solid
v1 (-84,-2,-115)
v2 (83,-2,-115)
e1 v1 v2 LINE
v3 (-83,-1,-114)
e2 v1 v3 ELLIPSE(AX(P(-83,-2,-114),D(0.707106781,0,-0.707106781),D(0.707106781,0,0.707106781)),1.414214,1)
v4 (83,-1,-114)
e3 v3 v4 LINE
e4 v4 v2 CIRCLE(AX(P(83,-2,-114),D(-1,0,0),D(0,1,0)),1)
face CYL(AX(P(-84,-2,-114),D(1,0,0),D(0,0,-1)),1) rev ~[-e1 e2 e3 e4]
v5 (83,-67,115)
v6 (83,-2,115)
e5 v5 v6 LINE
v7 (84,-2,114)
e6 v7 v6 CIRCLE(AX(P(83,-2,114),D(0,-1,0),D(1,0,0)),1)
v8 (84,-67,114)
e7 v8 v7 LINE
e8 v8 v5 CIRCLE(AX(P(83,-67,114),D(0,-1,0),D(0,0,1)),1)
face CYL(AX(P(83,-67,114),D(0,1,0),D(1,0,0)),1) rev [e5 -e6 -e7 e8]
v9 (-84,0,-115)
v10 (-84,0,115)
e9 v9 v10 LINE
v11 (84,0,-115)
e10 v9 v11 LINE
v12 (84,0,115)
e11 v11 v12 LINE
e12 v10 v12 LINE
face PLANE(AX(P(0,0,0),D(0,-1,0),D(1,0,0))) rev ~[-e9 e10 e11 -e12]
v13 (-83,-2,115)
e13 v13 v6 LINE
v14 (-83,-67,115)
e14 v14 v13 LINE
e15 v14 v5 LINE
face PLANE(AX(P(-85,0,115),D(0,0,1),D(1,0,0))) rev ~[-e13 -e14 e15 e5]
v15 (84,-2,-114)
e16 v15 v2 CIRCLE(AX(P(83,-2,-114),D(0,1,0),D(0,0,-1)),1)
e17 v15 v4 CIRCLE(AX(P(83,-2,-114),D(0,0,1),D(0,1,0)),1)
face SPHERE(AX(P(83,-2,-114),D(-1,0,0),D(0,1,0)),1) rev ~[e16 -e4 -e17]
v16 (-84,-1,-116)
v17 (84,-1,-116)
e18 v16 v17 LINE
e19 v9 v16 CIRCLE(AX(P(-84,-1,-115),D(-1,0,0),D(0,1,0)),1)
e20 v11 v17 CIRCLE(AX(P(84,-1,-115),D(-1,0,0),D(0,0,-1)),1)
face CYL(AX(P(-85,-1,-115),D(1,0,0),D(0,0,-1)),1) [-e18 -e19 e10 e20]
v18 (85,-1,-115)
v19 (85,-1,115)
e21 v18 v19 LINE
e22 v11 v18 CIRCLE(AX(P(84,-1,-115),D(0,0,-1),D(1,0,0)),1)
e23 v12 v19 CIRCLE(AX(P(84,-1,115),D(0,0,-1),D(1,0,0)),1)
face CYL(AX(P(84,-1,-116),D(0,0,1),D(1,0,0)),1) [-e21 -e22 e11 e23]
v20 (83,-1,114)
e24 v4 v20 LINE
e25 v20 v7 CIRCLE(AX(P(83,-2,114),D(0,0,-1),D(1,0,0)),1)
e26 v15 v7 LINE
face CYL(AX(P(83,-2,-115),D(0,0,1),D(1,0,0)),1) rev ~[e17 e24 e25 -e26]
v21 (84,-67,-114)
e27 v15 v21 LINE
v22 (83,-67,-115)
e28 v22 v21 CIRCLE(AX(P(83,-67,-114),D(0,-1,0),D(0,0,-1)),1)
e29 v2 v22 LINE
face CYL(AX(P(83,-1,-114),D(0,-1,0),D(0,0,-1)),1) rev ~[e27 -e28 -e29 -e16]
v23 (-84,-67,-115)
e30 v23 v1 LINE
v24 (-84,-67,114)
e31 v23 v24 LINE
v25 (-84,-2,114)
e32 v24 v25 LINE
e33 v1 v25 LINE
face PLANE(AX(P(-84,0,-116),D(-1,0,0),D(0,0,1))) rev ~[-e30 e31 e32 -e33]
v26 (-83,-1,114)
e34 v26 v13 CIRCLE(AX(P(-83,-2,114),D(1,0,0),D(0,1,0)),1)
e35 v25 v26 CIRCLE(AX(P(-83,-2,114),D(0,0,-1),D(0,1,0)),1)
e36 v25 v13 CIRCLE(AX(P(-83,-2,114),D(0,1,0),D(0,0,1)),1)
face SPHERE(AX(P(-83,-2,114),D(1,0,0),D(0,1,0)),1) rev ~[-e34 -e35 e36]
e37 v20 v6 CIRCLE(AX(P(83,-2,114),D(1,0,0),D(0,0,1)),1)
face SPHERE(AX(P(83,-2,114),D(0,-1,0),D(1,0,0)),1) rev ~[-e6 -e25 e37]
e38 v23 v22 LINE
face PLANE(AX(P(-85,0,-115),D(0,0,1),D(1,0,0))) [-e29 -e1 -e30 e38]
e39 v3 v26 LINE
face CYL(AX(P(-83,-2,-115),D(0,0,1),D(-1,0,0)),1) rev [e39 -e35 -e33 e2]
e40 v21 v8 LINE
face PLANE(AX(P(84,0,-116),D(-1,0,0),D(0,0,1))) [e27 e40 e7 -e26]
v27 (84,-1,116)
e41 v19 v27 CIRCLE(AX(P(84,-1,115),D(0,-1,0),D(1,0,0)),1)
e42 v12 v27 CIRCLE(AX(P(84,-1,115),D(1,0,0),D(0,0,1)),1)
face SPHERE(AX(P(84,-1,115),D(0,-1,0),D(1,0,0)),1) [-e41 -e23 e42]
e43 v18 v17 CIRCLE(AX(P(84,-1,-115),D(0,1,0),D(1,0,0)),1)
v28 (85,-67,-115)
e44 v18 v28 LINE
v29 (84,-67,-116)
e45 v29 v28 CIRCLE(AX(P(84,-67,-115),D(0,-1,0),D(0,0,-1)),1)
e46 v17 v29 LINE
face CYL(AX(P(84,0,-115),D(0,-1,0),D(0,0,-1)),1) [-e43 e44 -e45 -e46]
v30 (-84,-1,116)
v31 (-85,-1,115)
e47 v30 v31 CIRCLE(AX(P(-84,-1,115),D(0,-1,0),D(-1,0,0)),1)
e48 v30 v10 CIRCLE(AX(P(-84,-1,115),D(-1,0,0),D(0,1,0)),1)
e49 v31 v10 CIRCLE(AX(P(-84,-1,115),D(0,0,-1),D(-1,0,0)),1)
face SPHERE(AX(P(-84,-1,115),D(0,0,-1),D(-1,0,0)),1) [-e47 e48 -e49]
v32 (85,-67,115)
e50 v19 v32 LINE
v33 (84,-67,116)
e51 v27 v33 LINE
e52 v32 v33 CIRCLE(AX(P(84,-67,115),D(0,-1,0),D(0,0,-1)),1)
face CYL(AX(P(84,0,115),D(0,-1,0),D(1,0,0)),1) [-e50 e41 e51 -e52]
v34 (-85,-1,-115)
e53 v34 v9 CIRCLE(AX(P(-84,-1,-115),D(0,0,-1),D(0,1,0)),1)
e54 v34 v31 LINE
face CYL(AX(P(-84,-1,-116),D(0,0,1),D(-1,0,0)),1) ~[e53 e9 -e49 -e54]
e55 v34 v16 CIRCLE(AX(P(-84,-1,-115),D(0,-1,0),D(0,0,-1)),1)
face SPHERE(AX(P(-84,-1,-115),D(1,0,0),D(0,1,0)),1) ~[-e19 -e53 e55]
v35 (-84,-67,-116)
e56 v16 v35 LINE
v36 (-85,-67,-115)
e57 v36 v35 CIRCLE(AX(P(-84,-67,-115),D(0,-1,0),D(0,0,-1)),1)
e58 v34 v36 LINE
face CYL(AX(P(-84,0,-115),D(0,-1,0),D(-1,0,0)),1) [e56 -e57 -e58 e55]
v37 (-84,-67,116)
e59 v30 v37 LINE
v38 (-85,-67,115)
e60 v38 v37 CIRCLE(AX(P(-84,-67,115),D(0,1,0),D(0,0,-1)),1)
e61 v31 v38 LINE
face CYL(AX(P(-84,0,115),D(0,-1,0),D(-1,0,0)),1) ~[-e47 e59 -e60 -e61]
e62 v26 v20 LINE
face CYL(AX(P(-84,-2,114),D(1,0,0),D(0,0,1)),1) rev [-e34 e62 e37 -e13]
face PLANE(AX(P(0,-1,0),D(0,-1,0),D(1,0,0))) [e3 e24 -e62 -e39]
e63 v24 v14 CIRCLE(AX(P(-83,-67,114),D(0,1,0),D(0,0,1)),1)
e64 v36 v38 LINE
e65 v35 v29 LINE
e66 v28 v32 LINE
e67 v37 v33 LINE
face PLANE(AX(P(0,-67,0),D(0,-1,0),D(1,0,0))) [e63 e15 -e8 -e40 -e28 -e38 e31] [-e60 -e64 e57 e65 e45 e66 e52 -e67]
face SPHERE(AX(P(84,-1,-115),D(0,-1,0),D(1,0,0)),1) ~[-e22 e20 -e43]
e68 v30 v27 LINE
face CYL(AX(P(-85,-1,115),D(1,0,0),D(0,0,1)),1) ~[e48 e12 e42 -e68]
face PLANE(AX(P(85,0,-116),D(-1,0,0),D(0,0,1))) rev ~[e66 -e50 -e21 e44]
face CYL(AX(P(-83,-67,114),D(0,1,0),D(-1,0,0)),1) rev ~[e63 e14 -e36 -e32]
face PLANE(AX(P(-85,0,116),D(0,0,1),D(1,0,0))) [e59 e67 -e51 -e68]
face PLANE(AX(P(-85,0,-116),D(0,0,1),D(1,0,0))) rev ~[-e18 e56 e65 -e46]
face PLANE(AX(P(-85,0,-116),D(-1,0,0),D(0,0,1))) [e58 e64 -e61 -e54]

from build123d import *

# Parameters (mm, degrees)
F0_W     = 170
F0_H     = 232
F1_DEPTH = 67
F2_T     = -1
F3_R     = 1


with BuildPart() as f1:
    # F0 (on Front) → F1 (new body)
    with BuildSketch(Plane.XZ):
        Rectangle(F0_W, F0_H)
    extrude(amount=F1_DEPTH)

    # F2
    f2_openings = [f1.faces().sort_by_distance(p)[0] for p in [
        (0, -67, 0),
    ]]
    offset(amount=F2_T, openings=f2_openings)

    # F3
    f3_edges = [f1.edges().sort_by_distance(p)[0] for p in [
        (85, -33.5, -116),
        (85, -33.5, 116),
        (85, 0, 0),
        (0, 0, -116),
        (-85, 0, 0),
        (-85, -33.5, -116),
        (-85, -33.5, 116),
        (0, 0, 116),
        (84, -34, 115),
        (0, -1, -115),
        (84, -1, 0),
        (0, -1, 115),
        (-84, -1, 0),
        (84, -34, -115),
        (-84, -34, 115),
    ]]
    fillet(f3_edges, radius=F3_R)


solid = f1.part
